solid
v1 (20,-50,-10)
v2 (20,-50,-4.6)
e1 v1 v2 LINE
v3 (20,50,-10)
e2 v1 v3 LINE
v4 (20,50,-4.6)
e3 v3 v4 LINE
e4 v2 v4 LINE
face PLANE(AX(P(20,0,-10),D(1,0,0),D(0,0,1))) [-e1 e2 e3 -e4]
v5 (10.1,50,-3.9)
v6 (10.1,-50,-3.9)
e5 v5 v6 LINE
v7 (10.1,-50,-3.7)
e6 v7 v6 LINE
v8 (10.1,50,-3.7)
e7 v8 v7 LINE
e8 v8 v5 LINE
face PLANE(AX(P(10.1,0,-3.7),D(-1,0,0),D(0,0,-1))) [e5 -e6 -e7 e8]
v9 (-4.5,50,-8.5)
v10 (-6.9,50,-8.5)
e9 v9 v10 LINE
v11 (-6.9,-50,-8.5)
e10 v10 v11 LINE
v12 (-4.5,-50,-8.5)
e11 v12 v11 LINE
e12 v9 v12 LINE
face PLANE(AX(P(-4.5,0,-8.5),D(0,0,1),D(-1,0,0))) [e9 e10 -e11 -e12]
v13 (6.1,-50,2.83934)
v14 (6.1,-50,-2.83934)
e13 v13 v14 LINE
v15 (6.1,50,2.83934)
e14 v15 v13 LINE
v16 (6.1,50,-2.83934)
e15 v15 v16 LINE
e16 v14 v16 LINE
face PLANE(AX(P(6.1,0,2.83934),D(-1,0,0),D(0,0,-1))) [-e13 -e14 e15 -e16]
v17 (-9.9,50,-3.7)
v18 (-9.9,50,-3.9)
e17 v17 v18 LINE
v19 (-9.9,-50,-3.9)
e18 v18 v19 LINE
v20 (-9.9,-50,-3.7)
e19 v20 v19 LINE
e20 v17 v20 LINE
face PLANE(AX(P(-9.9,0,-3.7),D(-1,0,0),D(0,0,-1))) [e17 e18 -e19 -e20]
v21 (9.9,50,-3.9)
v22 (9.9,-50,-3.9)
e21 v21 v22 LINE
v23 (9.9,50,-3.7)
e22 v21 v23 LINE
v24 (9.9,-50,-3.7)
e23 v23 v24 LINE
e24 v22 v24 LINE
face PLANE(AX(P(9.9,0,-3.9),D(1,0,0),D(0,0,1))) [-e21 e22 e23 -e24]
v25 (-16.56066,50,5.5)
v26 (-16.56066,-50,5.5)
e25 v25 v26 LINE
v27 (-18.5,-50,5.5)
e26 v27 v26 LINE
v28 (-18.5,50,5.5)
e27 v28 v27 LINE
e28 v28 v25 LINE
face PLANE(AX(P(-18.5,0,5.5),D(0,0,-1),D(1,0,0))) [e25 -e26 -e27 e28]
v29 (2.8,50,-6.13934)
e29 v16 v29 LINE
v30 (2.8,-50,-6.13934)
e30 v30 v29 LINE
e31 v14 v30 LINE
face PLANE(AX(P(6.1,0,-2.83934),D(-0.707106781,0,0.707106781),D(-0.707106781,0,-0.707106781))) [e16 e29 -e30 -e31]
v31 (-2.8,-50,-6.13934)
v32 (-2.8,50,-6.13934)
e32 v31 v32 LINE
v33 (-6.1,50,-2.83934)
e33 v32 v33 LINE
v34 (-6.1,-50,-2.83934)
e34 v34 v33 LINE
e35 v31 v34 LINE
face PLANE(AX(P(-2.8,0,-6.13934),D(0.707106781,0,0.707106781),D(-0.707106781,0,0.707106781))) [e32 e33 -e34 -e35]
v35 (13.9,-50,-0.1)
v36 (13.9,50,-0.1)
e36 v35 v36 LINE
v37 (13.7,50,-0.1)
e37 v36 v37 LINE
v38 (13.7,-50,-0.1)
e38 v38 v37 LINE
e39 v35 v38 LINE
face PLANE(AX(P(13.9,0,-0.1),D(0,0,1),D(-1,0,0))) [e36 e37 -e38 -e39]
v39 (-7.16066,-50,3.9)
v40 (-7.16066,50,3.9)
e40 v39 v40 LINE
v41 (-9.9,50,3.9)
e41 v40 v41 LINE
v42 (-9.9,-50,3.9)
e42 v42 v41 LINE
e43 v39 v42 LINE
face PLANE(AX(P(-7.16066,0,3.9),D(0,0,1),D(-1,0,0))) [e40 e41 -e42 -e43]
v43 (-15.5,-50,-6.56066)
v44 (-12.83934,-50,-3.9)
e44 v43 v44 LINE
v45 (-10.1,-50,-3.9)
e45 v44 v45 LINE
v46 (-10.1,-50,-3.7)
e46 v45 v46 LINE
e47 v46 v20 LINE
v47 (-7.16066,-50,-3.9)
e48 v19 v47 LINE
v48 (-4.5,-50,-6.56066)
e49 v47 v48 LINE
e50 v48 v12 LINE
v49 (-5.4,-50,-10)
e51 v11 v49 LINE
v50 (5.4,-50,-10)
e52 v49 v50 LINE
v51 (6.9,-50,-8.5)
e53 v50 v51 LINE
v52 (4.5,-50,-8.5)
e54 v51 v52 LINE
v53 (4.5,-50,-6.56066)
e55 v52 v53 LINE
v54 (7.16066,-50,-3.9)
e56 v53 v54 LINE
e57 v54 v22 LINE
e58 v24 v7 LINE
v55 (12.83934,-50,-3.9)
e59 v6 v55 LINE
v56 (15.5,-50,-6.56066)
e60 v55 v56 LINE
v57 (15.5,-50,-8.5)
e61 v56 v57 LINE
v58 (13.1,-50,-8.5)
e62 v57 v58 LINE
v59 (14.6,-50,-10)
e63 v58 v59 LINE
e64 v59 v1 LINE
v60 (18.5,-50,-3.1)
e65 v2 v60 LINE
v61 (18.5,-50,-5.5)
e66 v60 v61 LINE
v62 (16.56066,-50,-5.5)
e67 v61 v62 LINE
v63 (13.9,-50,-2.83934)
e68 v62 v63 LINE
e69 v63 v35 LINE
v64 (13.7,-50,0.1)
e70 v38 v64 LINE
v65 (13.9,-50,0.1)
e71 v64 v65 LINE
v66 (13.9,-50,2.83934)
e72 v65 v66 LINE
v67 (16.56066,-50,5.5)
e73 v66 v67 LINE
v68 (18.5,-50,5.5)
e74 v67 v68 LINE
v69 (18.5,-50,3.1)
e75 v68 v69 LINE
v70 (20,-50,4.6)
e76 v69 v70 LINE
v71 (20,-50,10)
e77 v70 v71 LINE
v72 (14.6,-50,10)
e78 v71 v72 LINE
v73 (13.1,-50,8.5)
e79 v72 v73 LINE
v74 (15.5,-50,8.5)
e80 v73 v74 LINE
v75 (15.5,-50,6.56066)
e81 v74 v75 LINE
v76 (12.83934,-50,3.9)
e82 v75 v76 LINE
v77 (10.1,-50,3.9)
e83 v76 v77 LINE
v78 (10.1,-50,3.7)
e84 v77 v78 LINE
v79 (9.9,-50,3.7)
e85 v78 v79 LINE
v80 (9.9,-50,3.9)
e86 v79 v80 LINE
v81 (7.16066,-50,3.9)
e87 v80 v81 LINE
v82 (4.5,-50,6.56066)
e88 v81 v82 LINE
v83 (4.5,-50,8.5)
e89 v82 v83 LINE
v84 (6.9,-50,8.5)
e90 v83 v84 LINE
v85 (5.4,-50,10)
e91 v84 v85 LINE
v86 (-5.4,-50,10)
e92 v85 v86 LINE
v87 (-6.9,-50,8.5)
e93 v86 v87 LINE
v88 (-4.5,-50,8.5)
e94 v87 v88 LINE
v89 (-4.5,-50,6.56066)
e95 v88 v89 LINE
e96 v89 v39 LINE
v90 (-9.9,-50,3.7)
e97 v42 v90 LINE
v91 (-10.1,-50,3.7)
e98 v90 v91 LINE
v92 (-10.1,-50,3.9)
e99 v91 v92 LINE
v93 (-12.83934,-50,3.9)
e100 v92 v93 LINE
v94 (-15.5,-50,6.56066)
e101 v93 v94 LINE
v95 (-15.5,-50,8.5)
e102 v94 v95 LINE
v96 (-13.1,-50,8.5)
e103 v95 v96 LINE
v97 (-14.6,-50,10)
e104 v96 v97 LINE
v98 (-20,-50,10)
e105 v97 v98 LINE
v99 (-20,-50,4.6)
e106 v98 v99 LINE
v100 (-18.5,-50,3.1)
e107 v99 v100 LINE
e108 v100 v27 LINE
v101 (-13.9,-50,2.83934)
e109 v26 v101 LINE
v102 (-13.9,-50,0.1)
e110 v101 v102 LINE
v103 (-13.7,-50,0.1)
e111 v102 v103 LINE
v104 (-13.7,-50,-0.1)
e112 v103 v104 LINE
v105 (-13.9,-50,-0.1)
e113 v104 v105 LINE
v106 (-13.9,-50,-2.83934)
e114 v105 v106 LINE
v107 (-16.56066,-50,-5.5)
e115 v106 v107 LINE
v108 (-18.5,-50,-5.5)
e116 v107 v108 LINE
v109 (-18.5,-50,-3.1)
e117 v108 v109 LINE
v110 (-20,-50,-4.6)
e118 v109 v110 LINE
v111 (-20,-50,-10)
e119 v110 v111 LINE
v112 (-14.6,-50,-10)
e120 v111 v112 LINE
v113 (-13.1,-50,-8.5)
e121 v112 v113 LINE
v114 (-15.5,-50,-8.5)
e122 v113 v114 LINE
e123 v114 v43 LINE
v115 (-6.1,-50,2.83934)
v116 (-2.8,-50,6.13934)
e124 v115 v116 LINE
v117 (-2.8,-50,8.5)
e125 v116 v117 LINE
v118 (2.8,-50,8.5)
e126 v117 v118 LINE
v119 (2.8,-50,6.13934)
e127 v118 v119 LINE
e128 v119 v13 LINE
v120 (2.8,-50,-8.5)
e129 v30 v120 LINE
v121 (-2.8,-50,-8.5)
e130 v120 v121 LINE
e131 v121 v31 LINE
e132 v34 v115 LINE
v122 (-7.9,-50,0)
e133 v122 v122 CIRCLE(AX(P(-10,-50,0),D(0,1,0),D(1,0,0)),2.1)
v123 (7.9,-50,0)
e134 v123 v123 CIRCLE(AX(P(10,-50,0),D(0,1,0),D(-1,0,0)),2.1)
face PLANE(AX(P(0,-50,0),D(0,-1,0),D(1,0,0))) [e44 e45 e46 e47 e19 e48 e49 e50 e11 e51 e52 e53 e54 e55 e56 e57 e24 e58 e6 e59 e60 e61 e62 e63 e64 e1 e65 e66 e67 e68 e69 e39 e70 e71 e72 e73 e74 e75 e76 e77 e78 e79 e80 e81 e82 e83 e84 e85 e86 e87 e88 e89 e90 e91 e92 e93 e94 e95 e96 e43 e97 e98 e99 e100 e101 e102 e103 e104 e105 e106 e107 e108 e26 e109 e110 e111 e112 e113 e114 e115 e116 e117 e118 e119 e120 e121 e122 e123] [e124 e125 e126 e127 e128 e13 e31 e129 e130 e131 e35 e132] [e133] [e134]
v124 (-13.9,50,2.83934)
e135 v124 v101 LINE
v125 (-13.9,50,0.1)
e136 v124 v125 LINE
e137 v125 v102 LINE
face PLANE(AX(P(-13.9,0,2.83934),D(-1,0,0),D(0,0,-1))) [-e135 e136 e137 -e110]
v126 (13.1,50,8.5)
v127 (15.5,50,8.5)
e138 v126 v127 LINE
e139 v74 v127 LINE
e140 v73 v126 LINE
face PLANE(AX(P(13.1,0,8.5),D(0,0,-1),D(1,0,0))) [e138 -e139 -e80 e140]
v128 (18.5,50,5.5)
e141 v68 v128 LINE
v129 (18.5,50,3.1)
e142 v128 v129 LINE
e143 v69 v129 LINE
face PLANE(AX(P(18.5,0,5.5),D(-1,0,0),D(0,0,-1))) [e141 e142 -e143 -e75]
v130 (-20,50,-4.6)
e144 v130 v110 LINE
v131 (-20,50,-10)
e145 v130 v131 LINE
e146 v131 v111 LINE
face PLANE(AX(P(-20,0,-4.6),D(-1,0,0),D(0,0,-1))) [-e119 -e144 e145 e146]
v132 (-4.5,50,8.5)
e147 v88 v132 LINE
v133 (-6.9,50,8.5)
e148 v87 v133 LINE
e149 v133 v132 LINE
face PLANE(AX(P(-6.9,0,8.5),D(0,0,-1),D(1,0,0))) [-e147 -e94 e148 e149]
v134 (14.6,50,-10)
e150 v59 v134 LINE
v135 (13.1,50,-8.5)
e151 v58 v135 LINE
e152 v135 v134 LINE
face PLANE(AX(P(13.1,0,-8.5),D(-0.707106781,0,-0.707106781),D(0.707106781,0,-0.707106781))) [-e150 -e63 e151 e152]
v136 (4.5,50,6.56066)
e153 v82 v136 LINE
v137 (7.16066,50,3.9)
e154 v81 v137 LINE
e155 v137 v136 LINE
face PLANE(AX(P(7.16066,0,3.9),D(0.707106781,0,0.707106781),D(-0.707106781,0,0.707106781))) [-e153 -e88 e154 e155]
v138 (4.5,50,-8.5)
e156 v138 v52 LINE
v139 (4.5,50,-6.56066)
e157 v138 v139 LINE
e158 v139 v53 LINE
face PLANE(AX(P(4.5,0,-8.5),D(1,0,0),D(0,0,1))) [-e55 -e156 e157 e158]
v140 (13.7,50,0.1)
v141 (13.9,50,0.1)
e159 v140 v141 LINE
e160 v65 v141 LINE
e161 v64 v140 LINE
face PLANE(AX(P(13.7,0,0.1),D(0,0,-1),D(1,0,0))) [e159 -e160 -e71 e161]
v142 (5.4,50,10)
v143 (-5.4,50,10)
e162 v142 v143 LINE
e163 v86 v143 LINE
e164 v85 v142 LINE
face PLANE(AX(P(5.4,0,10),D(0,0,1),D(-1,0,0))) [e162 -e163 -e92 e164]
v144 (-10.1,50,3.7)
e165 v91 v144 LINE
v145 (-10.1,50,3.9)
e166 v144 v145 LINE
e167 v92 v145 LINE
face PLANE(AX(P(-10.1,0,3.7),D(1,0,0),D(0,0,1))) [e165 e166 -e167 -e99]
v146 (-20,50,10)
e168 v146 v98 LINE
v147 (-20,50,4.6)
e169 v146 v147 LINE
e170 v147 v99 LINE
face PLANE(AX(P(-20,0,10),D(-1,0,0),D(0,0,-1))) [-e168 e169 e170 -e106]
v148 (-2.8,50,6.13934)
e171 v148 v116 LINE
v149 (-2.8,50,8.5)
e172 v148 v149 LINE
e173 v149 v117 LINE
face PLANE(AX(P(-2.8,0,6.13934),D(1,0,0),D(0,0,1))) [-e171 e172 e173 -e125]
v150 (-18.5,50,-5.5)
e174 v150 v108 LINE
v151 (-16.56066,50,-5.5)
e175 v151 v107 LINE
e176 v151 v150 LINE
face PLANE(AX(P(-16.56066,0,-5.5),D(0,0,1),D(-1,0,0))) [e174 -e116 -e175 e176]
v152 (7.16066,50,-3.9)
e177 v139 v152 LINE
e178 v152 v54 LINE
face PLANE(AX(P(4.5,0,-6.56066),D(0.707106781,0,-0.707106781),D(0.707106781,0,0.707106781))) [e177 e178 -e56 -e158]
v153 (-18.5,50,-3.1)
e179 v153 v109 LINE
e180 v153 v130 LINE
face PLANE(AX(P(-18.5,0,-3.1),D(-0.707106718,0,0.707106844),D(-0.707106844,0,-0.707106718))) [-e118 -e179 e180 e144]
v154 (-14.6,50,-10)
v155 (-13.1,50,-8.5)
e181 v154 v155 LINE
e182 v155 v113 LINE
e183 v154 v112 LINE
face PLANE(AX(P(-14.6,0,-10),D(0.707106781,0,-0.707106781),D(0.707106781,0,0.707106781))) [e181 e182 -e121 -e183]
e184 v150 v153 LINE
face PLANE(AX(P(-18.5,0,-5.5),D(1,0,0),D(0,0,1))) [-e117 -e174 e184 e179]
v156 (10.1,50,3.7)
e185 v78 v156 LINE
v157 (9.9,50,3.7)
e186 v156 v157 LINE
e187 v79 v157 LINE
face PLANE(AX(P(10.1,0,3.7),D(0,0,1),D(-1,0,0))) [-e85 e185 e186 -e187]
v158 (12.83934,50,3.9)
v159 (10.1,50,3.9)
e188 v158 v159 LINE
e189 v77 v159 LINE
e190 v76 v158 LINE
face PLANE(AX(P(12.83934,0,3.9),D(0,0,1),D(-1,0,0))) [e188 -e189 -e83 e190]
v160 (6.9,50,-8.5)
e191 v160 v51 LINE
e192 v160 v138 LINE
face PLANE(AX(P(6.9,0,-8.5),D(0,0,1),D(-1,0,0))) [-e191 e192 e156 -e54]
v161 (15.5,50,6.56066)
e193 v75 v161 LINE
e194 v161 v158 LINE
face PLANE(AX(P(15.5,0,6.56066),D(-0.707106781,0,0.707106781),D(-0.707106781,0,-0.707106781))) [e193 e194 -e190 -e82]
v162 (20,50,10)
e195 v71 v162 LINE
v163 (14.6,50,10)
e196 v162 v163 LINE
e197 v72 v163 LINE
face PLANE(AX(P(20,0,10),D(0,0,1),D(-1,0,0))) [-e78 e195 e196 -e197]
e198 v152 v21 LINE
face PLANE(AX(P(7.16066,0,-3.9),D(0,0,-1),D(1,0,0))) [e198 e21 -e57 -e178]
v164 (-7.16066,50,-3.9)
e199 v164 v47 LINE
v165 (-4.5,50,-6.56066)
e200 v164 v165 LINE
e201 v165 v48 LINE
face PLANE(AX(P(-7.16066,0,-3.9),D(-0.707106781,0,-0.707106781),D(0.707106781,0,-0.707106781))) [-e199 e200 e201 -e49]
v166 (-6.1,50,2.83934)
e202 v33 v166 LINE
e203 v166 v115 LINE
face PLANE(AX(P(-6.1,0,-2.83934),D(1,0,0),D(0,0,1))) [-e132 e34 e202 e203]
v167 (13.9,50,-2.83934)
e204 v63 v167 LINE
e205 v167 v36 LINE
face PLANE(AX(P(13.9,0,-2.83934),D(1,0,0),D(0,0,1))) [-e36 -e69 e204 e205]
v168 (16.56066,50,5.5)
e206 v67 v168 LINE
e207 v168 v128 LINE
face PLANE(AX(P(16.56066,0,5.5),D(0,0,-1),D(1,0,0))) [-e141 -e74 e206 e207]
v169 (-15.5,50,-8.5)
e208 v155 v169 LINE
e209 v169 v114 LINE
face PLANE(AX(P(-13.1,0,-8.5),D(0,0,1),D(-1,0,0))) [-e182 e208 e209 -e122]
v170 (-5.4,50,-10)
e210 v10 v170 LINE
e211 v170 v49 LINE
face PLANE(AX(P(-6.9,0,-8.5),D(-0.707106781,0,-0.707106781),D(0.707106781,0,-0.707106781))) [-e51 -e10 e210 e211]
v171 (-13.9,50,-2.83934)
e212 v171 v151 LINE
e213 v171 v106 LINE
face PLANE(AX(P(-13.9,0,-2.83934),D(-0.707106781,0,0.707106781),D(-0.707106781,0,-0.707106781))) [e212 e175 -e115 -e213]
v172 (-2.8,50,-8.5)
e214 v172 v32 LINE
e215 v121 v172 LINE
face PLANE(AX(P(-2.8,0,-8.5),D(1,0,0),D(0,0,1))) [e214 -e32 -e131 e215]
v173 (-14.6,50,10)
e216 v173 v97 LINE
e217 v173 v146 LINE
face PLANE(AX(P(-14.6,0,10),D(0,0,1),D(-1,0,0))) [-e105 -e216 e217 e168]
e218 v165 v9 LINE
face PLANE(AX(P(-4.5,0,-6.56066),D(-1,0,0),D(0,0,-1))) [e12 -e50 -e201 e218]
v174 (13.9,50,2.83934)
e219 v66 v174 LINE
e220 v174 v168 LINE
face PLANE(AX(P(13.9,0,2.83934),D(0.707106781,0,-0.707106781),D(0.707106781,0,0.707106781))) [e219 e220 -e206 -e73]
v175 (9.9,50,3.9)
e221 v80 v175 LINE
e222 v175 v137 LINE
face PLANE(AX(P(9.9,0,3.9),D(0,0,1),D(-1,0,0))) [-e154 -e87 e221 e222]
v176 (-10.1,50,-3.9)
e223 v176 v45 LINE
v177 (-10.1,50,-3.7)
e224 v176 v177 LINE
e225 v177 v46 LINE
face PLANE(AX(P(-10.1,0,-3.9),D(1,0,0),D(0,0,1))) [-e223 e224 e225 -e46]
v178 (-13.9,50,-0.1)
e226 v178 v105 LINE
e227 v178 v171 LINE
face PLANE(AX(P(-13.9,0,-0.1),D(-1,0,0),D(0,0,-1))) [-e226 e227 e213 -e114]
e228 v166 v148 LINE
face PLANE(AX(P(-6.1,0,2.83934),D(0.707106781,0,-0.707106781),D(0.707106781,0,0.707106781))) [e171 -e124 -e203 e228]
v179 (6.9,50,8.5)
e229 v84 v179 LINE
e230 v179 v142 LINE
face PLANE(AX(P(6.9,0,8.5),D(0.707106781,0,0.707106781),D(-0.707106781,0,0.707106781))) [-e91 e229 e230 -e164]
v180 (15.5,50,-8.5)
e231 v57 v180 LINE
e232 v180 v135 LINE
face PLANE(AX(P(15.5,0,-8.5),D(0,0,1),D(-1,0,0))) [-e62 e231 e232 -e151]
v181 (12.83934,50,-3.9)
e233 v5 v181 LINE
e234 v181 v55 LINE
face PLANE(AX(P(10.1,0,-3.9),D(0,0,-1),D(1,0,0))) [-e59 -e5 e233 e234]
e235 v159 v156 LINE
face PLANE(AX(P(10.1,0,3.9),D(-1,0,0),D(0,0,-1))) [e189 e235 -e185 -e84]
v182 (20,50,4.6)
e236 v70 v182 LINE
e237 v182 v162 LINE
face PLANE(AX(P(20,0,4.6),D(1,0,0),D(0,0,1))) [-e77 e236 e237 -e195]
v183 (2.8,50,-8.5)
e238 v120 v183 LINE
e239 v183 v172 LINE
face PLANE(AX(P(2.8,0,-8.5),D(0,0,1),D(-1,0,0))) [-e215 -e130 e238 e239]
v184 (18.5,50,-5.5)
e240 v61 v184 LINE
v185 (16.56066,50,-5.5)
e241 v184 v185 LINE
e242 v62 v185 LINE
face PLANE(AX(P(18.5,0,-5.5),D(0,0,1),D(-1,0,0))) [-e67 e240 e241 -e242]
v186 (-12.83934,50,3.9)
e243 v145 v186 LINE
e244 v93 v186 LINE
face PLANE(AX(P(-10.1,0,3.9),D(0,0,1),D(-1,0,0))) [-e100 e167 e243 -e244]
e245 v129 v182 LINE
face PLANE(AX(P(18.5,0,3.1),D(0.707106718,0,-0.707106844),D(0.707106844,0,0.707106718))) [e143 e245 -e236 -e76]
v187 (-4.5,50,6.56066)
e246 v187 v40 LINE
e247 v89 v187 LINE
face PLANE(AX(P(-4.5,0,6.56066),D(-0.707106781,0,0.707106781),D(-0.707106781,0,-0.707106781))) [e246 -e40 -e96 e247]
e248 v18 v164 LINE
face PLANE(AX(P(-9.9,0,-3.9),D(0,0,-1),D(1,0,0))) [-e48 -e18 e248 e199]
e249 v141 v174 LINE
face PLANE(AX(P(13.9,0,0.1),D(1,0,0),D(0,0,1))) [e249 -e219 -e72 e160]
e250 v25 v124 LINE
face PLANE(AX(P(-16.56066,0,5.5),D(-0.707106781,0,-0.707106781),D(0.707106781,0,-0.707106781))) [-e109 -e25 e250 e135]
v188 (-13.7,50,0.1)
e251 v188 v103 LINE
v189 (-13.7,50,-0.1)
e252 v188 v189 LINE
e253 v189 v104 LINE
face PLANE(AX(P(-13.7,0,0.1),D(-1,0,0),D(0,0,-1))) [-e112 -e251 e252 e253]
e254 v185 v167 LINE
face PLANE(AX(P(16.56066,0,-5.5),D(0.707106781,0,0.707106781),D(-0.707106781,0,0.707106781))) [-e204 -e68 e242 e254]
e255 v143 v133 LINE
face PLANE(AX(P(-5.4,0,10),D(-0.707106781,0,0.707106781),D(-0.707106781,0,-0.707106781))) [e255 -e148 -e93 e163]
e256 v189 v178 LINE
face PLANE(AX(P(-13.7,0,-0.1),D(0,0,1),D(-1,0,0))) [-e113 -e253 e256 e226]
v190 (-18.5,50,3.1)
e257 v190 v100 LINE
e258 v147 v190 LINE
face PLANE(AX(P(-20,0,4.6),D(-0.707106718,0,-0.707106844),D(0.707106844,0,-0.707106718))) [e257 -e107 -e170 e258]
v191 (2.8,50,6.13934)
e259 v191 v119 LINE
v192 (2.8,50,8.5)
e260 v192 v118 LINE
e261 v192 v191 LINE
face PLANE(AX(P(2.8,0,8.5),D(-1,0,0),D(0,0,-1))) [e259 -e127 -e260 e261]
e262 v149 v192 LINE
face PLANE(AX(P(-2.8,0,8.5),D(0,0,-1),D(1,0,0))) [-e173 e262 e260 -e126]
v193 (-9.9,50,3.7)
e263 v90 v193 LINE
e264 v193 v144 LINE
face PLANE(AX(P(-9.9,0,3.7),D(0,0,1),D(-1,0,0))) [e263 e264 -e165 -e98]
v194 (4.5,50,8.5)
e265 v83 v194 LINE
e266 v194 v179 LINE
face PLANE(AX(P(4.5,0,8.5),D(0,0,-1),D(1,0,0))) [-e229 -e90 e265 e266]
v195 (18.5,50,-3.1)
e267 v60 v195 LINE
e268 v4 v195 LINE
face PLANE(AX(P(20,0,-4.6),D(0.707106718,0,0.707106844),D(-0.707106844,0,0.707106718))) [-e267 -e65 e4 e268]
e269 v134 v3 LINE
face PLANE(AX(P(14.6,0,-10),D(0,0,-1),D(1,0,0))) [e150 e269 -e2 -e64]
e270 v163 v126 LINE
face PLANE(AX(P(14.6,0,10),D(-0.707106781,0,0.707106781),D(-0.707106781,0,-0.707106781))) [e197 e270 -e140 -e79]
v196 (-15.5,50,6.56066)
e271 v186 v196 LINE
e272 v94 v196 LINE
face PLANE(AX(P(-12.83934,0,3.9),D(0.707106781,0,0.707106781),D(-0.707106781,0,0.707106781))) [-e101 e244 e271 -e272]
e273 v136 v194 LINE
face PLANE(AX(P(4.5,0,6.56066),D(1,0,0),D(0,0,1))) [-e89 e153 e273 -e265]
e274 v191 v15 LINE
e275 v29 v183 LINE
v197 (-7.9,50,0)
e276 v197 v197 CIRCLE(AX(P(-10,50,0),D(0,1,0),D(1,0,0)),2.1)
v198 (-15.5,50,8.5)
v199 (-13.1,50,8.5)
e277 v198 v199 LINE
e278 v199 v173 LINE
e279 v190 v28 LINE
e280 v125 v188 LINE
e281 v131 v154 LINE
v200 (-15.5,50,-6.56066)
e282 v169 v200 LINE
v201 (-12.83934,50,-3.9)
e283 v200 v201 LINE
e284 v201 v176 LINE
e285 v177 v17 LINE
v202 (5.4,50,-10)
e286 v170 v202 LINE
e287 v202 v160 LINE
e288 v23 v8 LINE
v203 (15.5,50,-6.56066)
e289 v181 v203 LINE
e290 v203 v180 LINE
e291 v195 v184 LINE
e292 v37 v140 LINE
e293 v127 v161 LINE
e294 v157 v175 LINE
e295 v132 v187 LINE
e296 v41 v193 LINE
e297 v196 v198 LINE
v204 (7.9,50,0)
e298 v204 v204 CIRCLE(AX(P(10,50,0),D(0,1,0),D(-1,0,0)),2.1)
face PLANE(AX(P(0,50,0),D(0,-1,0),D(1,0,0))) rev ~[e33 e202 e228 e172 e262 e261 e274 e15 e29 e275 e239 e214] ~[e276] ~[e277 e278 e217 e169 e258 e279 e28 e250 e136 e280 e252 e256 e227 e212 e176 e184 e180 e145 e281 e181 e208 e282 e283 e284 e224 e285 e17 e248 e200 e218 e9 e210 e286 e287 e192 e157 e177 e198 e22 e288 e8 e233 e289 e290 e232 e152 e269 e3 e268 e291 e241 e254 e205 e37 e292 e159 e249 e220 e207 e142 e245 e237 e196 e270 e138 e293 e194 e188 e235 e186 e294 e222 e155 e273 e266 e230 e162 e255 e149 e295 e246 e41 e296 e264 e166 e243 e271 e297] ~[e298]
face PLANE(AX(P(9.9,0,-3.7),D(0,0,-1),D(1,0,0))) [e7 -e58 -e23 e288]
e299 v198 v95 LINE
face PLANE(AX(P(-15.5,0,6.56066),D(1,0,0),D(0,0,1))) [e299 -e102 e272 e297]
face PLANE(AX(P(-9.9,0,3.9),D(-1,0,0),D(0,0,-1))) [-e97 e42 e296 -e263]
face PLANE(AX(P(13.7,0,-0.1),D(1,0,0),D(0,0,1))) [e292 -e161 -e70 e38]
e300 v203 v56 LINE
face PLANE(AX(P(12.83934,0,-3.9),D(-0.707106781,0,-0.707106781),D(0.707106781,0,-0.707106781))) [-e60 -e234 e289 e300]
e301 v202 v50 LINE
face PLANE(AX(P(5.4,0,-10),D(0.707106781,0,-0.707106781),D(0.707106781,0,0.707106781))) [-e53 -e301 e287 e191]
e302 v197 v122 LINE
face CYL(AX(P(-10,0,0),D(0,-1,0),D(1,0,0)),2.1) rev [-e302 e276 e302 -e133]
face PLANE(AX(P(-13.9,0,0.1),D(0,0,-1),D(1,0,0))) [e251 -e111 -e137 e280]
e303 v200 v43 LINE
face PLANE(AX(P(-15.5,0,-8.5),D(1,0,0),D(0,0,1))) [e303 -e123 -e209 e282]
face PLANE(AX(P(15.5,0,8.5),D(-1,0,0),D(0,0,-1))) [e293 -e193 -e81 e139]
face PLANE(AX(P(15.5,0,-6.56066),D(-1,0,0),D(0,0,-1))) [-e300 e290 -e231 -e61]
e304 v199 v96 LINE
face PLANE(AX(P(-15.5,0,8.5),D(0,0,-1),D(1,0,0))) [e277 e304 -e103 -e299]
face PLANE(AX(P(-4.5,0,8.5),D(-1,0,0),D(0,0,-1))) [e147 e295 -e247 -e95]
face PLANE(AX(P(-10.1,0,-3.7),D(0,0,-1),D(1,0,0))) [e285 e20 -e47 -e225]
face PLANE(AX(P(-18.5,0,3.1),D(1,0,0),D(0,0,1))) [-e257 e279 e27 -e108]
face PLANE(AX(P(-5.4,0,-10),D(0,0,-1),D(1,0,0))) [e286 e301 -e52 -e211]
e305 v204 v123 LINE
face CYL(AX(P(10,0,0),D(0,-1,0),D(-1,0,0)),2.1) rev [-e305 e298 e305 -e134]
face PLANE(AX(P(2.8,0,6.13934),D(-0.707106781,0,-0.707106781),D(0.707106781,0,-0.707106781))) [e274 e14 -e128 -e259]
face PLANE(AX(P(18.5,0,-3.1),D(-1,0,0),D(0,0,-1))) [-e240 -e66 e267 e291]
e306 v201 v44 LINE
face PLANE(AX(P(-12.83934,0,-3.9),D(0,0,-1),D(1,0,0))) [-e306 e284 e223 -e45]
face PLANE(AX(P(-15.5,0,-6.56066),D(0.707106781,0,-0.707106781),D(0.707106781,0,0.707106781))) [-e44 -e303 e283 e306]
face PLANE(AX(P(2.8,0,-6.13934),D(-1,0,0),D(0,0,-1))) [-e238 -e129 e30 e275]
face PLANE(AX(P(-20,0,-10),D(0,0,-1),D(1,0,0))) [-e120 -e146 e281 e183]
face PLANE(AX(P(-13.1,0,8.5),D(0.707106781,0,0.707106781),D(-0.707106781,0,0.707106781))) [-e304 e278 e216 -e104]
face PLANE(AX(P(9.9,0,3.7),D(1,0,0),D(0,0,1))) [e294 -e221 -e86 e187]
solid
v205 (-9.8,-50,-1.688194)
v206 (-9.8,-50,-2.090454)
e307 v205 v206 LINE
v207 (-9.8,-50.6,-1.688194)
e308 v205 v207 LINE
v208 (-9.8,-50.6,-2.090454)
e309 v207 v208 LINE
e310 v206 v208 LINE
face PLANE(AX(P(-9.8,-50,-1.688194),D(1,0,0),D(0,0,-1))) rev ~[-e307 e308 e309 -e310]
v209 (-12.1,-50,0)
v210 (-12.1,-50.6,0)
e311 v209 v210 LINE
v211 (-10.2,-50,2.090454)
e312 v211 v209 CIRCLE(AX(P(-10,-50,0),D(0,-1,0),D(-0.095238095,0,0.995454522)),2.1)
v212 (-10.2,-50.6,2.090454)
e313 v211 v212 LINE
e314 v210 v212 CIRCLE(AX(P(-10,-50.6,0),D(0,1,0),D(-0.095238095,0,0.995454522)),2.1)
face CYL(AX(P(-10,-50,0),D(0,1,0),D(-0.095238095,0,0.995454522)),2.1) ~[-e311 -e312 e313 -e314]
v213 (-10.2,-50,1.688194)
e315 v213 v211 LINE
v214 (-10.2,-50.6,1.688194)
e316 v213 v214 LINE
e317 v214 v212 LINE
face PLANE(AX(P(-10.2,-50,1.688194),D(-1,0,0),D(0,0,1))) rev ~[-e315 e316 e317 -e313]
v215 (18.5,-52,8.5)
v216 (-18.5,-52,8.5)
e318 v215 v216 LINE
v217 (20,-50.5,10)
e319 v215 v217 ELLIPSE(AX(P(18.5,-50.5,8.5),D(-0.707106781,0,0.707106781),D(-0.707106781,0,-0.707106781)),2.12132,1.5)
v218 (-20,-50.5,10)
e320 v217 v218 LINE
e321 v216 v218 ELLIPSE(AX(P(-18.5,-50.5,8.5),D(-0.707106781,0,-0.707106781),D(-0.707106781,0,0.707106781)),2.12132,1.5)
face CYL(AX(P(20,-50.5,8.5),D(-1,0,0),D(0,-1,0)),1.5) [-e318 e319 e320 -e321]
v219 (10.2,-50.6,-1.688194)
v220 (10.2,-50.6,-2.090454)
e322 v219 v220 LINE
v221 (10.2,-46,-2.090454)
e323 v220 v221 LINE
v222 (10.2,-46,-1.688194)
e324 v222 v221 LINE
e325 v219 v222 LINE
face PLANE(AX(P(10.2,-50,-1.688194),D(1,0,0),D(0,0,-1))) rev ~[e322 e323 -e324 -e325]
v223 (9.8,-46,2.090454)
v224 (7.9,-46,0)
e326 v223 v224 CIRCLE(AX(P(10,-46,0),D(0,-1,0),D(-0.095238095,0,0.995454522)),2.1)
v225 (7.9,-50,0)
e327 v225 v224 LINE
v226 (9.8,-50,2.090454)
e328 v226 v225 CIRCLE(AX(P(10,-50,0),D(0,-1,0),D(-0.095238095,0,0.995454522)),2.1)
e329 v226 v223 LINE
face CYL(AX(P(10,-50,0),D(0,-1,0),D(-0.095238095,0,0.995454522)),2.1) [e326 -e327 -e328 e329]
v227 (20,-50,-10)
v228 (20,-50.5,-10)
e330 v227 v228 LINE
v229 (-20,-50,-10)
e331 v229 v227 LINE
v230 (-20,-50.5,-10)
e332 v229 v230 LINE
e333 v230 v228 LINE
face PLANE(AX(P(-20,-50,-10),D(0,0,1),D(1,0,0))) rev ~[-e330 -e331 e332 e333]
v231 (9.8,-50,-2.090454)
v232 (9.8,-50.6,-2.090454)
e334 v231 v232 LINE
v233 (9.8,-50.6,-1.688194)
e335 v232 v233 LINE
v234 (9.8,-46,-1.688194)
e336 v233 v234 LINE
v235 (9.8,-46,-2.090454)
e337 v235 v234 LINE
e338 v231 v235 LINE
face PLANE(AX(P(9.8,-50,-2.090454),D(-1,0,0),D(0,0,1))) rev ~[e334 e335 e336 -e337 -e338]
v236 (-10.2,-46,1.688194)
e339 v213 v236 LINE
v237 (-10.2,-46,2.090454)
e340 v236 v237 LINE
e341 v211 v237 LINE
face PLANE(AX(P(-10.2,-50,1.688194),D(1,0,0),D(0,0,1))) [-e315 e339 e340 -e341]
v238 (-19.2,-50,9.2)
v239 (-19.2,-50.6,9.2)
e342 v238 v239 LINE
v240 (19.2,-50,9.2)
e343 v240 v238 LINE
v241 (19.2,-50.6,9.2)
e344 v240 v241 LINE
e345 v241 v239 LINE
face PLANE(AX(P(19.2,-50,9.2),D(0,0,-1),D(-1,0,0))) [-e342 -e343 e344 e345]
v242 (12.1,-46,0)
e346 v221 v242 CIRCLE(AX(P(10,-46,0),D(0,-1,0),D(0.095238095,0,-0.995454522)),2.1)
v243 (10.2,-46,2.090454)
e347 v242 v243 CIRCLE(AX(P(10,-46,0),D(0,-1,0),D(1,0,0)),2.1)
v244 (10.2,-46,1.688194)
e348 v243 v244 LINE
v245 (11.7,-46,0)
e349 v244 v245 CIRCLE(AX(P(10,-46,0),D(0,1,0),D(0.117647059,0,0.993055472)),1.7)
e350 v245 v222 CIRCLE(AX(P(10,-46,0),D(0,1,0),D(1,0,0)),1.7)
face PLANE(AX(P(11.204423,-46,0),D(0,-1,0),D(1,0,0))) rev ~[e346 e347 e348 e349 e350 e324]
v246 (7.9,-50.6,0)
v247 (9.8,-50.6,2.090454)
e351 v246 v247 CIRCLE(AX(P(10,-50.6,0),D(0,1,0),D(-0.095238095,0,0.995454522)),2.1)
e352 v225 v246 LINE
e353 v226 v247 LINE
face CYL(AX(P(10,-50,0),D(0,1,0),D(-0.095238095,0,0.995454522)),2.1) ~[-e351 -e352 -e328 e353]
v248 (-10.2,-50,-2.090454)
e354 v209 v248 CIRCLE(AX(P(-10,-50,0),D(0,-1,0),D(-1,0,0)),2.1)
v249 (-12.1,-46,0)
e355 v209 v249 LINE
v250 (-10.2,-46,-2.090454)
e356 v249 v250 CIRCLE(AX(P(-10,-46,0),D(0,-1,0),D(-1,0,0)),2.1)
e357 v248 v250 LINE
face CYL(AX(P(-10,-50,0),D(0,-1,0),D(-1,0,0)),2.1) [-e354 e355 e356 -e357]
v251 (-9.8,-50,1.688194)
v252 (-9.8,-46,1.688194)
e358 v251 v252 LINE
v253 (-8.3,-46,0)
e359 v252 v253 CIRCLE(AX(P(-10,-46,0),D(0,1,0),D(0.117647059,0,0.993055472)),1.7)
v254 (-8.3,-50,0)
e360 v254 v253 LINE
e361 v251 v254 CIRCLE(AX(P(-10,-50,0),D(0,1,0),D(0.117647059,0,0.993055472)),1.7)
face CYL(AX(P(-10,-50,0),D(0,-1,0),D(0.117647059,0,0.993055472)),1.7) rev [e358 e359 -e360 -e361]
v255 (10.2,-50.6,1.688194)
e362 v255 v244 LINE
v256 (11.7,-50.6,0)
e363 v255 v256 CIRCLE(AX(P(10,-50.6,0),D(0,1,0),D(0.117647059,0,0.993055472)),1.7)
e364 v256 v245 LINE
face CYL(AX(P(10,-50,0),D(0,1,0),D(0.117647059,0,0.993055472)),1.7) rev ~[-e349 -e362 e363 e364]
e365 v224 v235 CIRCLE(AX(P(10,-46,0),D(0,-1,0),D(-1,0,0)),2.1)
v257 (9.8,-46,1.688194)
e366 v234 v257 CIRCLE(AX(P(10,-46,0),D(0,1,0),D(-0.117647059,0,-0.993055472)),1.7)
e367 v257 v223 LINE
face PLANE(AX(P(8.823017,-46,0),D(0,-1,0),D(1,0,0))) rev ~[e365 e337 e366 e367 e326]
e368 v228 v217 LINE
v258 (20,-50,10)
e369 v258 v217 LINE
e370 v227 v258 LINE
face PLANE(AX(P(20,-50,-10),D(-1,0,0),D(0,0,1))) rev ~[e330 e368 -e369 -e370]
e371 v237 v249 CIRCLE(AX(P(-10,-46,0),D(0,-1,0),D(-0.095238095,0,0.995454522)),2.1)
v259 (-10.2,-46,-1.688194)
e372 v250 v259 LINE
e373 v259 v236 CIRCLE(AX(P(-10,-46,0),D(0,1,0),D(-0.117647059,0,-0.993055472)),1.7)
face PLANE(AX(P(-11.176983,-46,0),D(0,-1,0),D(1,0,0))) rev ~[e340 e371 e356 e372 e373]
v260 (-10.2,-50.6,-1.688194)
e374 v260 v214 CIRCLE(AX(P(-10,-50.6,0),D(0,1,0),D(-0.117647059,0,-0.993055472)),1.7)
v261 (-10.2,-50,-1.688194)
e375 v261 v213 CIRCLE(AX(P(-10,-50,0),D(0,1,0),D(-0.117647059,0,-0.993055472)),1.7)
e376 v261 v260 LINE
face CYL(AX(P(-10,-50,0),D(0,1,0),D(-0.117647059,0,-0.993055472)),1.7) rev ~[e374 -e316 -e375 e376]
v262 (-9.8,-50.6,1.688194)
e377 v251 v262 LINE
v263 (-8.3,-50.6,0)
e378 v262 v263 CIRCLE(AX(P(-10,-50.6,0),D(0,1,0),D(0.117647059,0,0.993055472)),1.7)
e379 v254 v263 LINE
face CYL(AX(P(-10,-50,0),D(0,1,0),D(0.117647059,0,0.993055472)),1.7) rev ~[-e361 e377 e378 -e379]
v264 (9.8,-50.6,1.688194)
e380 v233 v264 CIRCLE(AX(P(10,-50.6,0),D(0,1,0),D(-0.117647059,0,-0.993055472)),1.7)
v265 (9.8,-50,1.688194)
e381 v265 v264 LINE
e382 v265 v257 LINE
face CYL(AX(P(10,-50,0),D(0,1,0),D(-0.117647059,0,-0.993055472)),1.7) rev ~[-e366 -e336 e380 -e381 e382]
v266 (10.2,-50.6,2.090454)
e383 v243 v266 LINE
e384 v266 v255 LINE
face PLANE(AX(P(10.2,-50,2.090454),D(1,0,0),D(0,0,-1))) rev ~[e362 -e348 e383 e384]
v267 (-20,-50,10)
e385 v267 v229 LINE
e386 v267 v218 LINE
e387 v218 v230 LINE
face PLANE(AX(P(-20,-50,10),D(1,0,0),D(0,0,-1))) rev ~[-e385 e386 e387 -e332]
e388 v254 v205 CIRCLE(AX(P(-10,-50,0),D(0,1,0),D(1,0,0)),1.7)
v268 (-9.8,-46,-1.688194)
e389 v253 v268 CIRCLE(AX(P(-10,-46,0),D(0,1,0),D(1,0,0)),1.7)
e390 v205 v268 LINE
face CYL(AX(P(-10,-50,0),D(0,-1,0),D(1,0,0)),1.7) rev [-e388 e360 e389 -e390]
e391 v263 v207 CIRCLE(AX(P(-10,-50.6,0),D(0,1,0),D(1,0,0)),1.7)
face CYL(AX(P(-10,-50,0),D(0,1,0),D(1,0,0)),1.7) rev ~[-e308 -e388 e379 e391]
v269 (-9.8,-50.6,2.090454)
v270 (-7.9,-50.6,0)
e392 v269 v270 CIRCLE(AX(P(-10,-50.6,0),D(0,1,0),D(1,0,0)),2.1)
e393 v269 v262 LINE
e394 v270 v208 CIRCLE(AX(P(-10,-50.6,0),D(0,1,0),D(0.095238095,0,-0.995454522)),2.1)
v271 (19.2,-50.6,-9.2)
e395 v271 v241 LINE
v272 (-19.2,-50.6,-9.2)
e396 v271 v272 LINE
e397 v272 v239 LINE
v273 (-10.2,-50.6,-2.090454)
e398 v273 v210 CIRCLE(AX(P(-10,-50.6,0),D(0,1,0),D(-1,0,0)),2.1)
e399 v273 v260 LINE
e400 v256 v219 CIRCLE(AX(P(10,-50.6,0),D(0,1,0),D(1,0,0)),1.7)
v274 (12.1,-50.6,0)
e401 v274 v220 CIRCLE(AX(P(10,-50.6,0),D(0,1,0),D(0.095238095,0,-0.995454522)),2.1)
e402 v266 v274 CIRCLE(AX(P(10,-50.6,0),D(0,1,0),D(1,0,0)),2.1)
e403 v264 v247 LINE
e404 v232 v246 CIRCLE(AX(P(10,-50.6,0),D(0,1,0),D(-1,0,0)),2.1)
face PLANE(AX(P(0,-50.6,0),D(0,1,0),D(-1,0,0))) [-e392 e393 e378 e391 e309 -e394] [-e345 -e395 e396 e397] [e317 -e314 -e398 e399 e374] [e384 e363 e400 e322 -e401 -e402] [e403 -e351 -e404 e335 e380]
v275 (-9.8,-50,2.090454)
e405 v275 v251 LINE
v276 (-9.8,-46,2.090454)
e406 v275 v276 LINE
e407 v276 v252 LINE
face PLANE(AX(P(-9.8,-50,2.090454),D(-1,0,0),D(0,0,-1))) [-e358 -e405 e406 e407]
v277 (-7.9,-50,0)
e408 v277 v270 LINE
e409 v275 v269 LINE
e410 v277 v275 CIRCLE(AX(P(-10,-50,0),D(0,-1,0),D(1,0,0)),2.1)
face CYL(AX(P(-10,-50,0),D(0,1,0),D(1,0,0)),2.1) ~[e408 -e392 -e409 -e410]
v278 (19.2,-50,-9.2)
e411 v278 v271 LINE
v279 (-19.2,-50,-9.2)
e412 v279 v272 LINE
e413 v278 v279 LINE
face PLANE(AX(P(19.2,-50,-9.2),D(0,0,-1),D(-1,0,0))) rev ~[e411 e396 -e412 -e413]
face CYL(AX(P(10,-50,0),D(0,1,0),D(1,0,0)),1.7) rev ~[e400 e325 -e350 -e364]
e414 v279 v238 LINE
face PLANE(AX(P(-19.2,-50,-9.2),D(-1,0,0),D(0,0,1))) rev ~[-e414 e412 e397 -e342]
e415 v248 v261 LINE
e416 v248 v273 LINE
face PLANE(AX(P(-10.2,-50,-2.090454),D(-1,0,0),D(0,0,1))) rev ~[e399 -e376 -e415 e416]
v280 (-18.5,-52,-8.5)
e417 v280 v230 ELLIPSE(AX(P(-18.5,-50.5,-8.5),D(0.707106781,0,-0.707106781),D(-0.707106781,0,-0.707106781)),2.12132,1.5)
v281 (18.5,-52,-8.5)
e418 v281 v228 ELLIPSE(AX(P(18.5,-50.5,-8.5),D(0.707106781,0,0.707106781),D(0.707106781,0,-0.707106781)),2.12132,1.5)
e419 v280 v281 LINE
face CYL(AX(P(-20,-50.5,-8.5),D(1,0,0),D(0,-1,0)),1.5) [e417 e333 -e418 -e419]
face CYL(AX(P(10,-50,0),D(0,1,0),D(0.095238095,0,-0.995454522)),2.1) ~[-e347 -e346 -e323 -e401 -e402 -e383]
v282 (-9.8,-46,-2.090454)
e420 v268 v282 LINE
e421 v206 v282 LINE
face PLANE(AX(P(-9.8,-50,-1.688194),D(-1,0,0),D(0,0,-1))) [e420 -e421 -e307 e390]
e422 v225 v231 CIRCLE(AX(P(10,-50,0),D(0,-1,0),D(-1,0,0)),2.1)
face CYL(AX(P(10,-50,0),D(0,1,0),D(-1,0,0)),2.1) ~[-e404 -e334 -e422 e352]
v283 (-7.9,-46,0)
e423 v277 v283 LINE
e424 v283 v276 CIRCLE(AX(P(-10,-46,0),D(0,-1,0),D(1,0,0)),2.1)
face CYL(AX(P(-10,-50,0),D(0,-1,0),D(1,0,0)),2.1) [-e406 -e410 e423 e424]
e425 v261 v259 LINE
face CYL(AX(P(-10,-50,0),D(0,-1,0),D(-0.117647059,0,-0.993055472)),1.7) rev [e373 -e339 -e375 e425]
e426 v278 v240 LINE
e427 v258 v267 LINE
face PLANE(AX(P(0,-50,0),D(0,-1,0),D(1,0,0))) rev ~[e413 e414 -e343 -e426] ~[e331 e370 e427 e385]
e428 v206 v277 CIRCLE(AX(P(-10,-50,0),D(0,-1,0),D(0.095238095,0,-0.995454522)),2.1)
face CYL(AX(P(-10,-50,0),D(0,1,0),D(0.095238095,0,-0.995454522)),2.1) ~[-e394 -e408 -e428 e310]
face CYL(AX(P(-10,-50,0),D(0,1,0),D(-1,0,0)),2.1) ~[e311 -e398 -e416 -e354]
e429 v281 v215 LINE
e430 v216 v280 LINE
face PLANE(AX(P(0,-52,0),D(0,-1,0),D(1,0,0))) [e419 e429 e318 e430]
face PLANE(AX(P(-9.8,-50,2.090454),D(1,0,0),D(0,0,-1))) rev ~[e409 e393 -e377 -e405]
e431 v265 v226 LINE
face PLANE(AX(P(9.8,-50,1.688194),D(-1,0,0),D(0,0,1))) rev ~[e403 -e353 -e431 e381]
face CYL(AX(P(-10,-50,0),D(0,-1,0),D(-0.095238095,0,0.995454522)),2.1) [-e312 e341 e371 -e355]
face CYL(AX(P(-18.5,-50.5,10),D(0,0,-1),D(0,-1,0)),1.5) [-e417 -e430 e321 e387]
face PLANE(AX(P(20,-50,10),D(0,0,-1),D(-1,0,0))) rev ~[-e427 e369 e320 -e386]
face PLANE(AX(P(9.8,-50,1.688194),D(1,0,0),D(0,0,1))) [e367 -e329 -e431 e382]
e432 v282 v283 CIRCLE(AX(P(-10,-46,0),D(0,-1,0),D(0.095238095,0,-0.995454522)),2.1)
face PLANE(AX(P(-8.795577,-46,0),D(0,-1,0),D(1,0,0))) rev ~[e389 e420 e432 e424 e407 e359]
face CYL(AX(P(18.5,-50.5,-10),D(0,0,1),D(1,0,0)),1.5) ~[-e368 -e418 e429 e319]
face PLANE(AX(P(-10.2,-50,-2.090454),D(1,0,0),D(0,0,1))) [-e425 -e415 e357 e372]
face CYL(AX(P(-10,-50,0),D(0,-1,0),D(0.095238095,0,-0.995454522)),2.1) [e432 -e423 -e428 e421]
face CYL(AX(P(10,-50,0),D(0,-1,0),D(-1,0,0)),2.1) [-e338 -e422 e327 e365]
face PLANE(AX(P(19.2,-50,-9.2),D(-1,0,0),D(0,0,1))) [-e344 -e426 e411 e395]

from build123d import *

# Parameters (mm, degrees)
F1_DEPTH      = 50
F3_DEPTH      = 2
F4_W          = 38.4
F4_H          = 18.3999997326
F5_DEPTH      = 0.6
F6_DEPTH      = 4
F6_DEPTH_BACK = 1
F7_R          = 1.5


with BuildPart() as f1:
    # F0 (on Front) → F1 (new body, symmetric)
    with BuildSketch(Plane.XZ):
        Polygon((-15.5, 6.5606601718), (-15.5, 8.4999998663), (-13.1, 8.4999998663), (-14.6, 9.9999998663), (-20, 9.9999998663), (-20, 4.5999998663), (-18.4999998663, 3.1), (-18.4999998663, 5.5), (-16.5606601718, 5.5), (-13.9, 2.8393398282), (-13.9, 0.1), (-13.7, 0.1), (-13.7, 0), (-13.7, -0.1), (-13.9, -0.1), (-13.9, -2.8393398282), (-16.5606601718, -5.5), (-18.4999998663, -5.5), (-18.4999998663, -3.1), (-20, -4.5999998663), (-20, -9.9999998663), (-14.6, -9.9999998663), (-13.1, -8.4999998663), (-15.5, -8.4999998663), (-15.5, -6.5606601718), (-12.8393398282, -3.9), (-10.1, -3.9), (-10.1, -3.7), (-9.9, -3.7), (-9.9, -3.9), (-7.1606601718, -3.9), (-4.5, -6.5606601718), (-4.5, -8.4999998663), (-6.9, -8.4999998663), (-5.4, -9.9999998663), (0, -9.9999998663), (5.4, -9.9999998663), (6.9, -8.4999998663), (4.5, -8.4999998663), (4.5, -6.5606601718), (7.1606601718, -3.9), (9.9, -3.9), (9.9, -3.7), (10.1, -3.7), (10.1, -3.9), (12.8393398282, -3.9), (15.5, -6.5606601718), (15.5, -8.4999998663), (13.1, -8.4999998663), (14.6, -9.9999998663), (20, -9.9999998663), (20, -4.5999998663), (18.4999998663, -3.1), (18.4999998663, -5.5), (16.5606601718, -5.5), (13.9, -2.8393398282), (13.9, -0.1), (13.7, -0.1), (13.7, 0), (13.7, 0.1), (13.9, 0.1), (13.9, 2.8393398282), (16.5606601718, 5.5), (18.4999998663, 5.5), (18.4999998663, 3.1), (20, 4.5999998663), (20, 9.9999998663), (14.6, 9.9999998663), (13.1, 8.4999998663), (15.5, 8.4999998663), (15.5, 6.5606601718), (12.8393398282, 3.9), (10.1, 3.9), (10.1, 3.7), (9.9, 3.7), (9.9, 3.9), (7.1606601718, 3.9), (4.5, 6.5606601718), (4.5, 8.4999998663), (6.9, 8.4999998663), (5.4, 9.9999998663), (0, 9.9999998663), (-5.4, 9.9999998663), (-6.9, 8.4999998663), (-4.5, 8.4999998663), (-4.5, 6.5606601718), (-7.1606601718, 3.9), (-9.9, 3.9), (-9.9, 3.7), (-10.1, 3.7), (-10.1, 3.9), (-12.8393398282, 3.9), align=None)
        with BuildLine():
            ThreePointArc((-12.1, 0), (-10, 2.1), (-7.9, 0))
            ThreePointArc((-7.9, 0), (-10, -2.1), (-12.1, 0))
        make_face(mode=Mode.SUBTRACT)
        Polygon((-6.1, 2.8393398282), (-2.8, 6.1393398282), (-2.8, 8.4999998663), (0, 8.4999998663), (2.8, 8.4999998663), (2.8, 6.1393398282), (6.1, 2.8393398282), (6.1, 0), (6.1, -2.8393398282), (2.8, -6.1393398282), (2.8, -8.4999998663), (0, -8.4999998663), (-2.8, -8.4999998663), (-2.8, -6.1393398282), (-6.1, -2.8393398282), (-6.1, 0), align=None, mode=Mode.SUBTRACT)
        with BuildLine():
            ThreePointArc((12.1, 0), (10, -2.1), (7.9, 0))
            ThreePointArc((7.9, 0), (10, 2.1), (12.1, 0))
        make_face(mode=Mode.SUBTRACT)
    extrude(amount=F1_DEPTH, both=True)


with BuildPart() as f3:
    # F2 (on face) → F3 (new body)
    with BuildSketch(Plane.XZ.offset(50)):
        Polygon((-14.6, 9.9999998663), (-20, 9.9999998663), (-20, 4.5999998663), (-18.4999998663, 3.1), (-18.4999998663, 5.5), (-16.5606601718, 5.5), (-13.9, 2.8393398282), (-13.9, 0.1), (-13.7, 0.1), (-13.7, -0.1), (-13.9, -0.1), (-13.9, -2.8393398282), (-16.5606601718, -5.5), (-18.4999998663, -5.5), (-18.4999998663, -3.1), (-20, -4.5999998663), (-20, -9.9999998663), (-14.6, -9.9999998663), (-13.1, -8.4999998663), (-15.5, -8.4999998663), (-15.5, -6.5606601718), (-12.8393398282, -3.9), (-10.1, -3.9), (-10.1, -3.7), (-9.9, -3.7), (-9.9, -3.9), (-7.1606601718, -3.9), (-4.5, -6.5606601718), (-4.5, -8.4999998663), (-6.9, -8.4999998663), (-5.4, -9.9999998663), (5.4, -9.9999998663), (6.9, -8.4999998663), (4.5, -8.4999998663), (4.5, -6.5606601718), (7.1606601718, -3.9), (9.9, -3.9), (9.9, -3.7), (10.1, -3.7), (10.1, -3.9), (12.8393398282, -3.9), (15.5, -6.5606601718), (15.5, -8.4999998663), (13.1, -8.4999998663), (14.6, -9.9999998663), (20, -9.9999998663), (20, -4.5999998663), (18.4999998663, -3.1), (18.4999998663, -5.5), (16.5606601718, -5.5), (13.9, -2.8393398282), (13.9, -0.1), (13.7, -0.1), (13.7, 0.1), (13.9, 0.1), (13.9, 2.8393398282), (16.5606601718, 5.5), (18.4999998663, 5.5), (18.4999998663, 3.1), (20, 4.5999998663), (20, 9.9999998663), (14.6, 9.9999998663), (13.1, 8.4999998663), (15.5, 8.4999998663), (15.5, 6.5606601718), (12.8393398282, 3.9), (10.1, 3.9), (10.1, 3.7), (9.9, 3.7), (9.9, 3.9), (7.1606601718, 3.9), (4.5, 6.5606601718), (4.5, 8.4999998663), (6.9, 8.4999998663), (5.4, 9.9999998663), (-5.4, 9.9999998663), (-6.9, 8.4999998663), (-4.5, 8.4999998663), (-4.5, 6.5606601718), (-7.1606601718, 3.9), (-9.9, 3.9), (-9.9, 3.7), (-10.1, 3.7), (-10.1, 3.9), (-12.8393398282, 3.9), (-15.5, 6.5606601718), (-15.5, 8.4999998663), (-13.1, 8.4999998663), align=None)
        with BuildLine():
            ThreePointArc((-9.8, 2.090454496), (-8.4459729732, 1.4124446892), (-7.9, 0))
            ThreePointArc((-7.9, 0), (-8.4459729732, -1.4124446892), (-9.8, -2.090454496))
            ThreePointArc((-9.8, -2.090454496), (-10, -2.1), (-10.2, -2.090454496))
            ThreePointArc((-10.2, -2.090454496), (-11.5540270268, -1.4124446892), (-12.1, 0))
            ThreePointArc((-12.1, 0), (-11.5540270268, 1.4124446892), (-10.2, 2.090454496))
            ThreePointArc((-10.2, 2.090454496), (-10, 2.1), (-9.8, 2.090454496))
        make_face(mode=Mode.SUBTRACT)
        Polygon((6.1, -2.8393398282), (2.8, -6.1393398282), (2.8, -8.4999998663), (0, -8.4999998663), (-2.8, -8.4999998663), (-2.8, -6.1393398282), (-6.1, -2.8393398282), (-6.1, 0), (-6.1, 2.8393398282), (-2.8, 6.1393398282), (-2.8, 8.4999998663), (0, 8.4999998663), (2.8, 8.4999998663), (2.8, 6.1393398282), (6.1, 2.8393398282), (6.1, 0), align=None, mode=Mode.SUBTRACT)
        with BuildLine():
            ThreePointArc((10.2, 2.090454496), (11.5540270268, 1.4124446892), (12.1, 0))
            ThreePointArc((12.1, 0), (11.5540270268, -1.4124446892), (10.2, -2.090454496))
            ThreePointArc((10.2, -2.090454496), (10, -2.1), (9.8, -2.090454496))
            ThreePointArc((9.8, -2.090454496), (8.4459729732, -1.4124446892), (7.9, 0))
            ThreePointArc((7.9, 0), (8.4459729732, 1.4124446892), (9.8, 2.090454496))
            ThreePointArc((9.8, 2.090454496), (10, 2.1), (10.2, 2.090454496))
        make_face(mode=Mode.SUBTRACT)
        Polygon((2.8, -8.4999998663), (2.8, -6.1393398282), (6.1, -2.8393398282), (6.1, 0), (6.1, 2.8393398282), (2.8, 6.1393398282), (2.8, 8.4999998663), (0, 8.4999998663), (-2.8, 8.4999998663), (-2.8, 6.1393398282), (-6.1, 2.8393398282), (-6.1, 0), (-6.1, -2.8393398282), (-2.8, -6.1393398282), (-2.8, -8.4999998663), (0, -8.4999998663), align=None)
        Polygon((20, -4.5999998663), (20, 4.5999998663), (18.4999998663, 3.1), (18.4999998663, 5.5), (16.5606601718, 5.5), (13.9, 2.8393398282), (13.9, 0.1), (13.7, 0.1), (13.7, -0.1), (13.9, -0.1), (13.9, -2.8393398282), (16.5606601718, -5.5), (18.4999998663, -5.5), (18.4999998663, -3.1), align=None)
        Polygon((-18.4999998663, 3.1), (-20, 4.5999998663), (-20, -4.5999998663), (-18.4999998663, -3.1), (-18.4999998663, -5.5), (-16.5606601718, -5.5), (-13.9, -2.8393398282), (-13.9, -0.1), (-13.7, -0.1), (-13.7, 0.1), (-13.9, 0.1), (-13.9, 2.8393398282), (-16.5606601718, 5.5), (-18.4999998663, 5.5), align=None)
        Polygon((-5.4, 9.9999998663), (-14.6, 9.9999998663), (-13.1, 8.4999998663), (-15.5, 8.4999998663), (-15.5, 6.5606601718), (-12.8393398282, 3.9), (-10.1, 3.9), (-10.1, 3.7), (-9.9, 3.7), (-9.9, 3.9), (-7.1606601718, 3.9), (-4.5, 6.5606601718), (-4.5, 8.4999998663), (-6.9, 8.4999998663), align=None)
        Polygon((14.6, 9.9999998663), (5.4, 9.9999998663), (6.9, 8.4999998663), (4.5, 8.4999998663), (4.5, 6.5606601718), (7.1606601718, 3.9), (9.9, 3.9), (9.9, 3.7), (10.1, 3.7), (10.1, 3.9), (12.8393398282, 3.9), (15.5, 6.5606601718), (15.5, 8.4999998663), (13.1, 8.4999998663), align=None)
        Polygon((6.9, -8.4999998663), (5.4, -9.9999998663), (14.6, -9.9999998663), (13.1, -8.4999998663), (15.5, -8.4999998663), (15.5, -6.5606601718), (12.8393398282, -3.9), (10.1, -3.9), (10.1, -3.7), (9.9, -3.7), (9.9, -3.9), (7.1606601718, -3.9), (4.5, -6.5606601718), (4.5, -8.4999998663), align=None)
        Polygon((-13.1, -8.4999998663), (-14.6, -9.9999998663), (-5.4, -9.9999998663), (-6.9, -8.4999998663), (-4.5, -8.4999998663), (-4.5, -6.5606601718), (-7.1606601718, -3.9), (-9.9, -3.9), (-9.9, -3.7), (-10.1, -3.7), (-10.1, -3.9), (-12.8393398282, -3.9), (-15.5, -6.5606601718), (-15.5, -8.4999998663), align=None)
        with BuildLine():
            ThreePointArc((-8.3, 0), (-8.7291734973, 1.1291589791), (-9.8, 1.6881943016))
            ThreePointArc((-9.8, 1.6881943016), (-10, 1.7), (-10.2, 1.6881943016))
            ThreePointArc((-10.2, 1.6881943016), (-11.7, 0), (-10.2, -1.6881943016))
            ThreePointArc((-10.2, -1.6881943016), (-10, -1.7), (-9.8, -1.6881943016))
            ThreePointArc((-9.8, -1.6881943016), (-8.7291734973, -1.1291589791), (-8.3, 0))
        make_face()
        with BuildLine():
            ThreePointArc((11.7, 0), (11.2708265027, 1.1291589791), (10.2, 1.6881943016))
            ThreePointArc((10.2, 1.6881943016), (10, 1.7), (9.8, 1.6881943016))
            ThreePointArc((9.8, 1.6881943016), (8.3, 0), (9.8, -1.6881943016))
            ThreePointArc((9.8, -1.6881943016), (10, -1.7), (10.2, -1.6881943016))
            ThreePointArc((10.2, -1.6881943016), (11.2708265027, -1.1291589791), (11.7, 0))
        make_face()
        with BuildLine():
            Line((9.8, 1.6881943016), (9.8, 2.090454496))
            ThreePointArc((9.8, 2.090454496), (8.4459729732, 1.4124446892), (7.9, 0))
            ThreePointArc((7.9, 0), (8.4459729732, -1.4124446892), (9.8, -2.090454496))
            Line((9.8, -2.090454496), (9.8, -1.6881943016))
            ThreePointArc((9.8, -1.6881943016), (8.3, 0), (9.8, 1.6881943016))
        make_face()
        with BuildLine():
            ThreePointArc((10.2, -2.090454496), (11.5540270268, -1.4124446892), (12.1, 0))
            ThreePointArc((12.1, 0), (11.5540270268, 1.4124446892), (10.2, 2.090454496))
            Line((10.2, 2.090454496), (10.2, 1.6881943016))
            ThreePointArc((10.2, 1.6881943016), (11.2708265027, 1.1291589791), (11.7, 0))
            ThreePointArc((11.7, 0), (11.2708265027, -1.1291589791), (10.2, -1.6881943016))
            Line((10.2, -1.6881943016), (10.2, -2.090454496))
        make_face()
        with BuildLine():
            Line((-10.2, 1.6881943016), (-10.2, 2.090454496))
            ThreePointArc((-10.2, 2.090454496), (-11.5540270268, 1.4124446892), (-12.1, 0))
            ThreePointArc((-12.1, 0), (-11.5540270268, -1.4124446892), (-10.2, -2.090454496))
            Line((-10.2, -2.090454496), (-10.2, -1.6881943016))
            ThreePointArc((-10.2, -1.6881943016), (-11.7, 0), (-10.2, 1.6881943016))
        make_face()
        with BuildLine():
            ThreePointArc((-9.8, -2.090454496), (-8.4459729732, -1.4124446892), (-7.9, 0))
            ThreePointArc((-7.9, 0), (-8.4459729732, 1.4124446892), (-9.8, 2.090454496))
            Line((-9.8, 2.090454496), (-9.8, 1.6881943016))
            ThreePointArc((-9.8, 1.6881943016), (-8.7291734973, 1.1291589791), (-8.3, 0))
            ThreePointArc((-8.3, 0), (-8.7291734973, -1.1291589791), (-9.8, -1.6881943016))
            Line((-9.8, -1.6881943016), (-9.8, -2.090454496))
        make_face()
        with BuildLine():
            Line((10.2, 1.6881943016), (10.2, 2.090454496))
            ThreePointArc((10.2, 2.090454496), (10, 2.1), (9.8, 2.090454496))
            Line((9.8, 2.090454496), (9.8, 1.6881943016))
            ThreePointArc((9.8, 1.6881943016), (10, 1.7), (10.2, 1.6881943016))
        make_face()
        with BuildLine():
            ThreePointArc((9.8, -2.090454496), (10, -2.1), (10.2, -2.090454496))
            Line((10.2, -2.090454496), (10.2, -1.6881943016))
            ThreePointArc((10.2, -1.6881943016), (10, -1.7), (9.8, -1.6881943016))
            Line((9.8, -1.6881943016), (9.8, -2.090454496))
        make_face()
        with BuildLine():
            Line((-9.8, 1.6881943016), (-9.8, 2.090454496))
            ThreePointArc((-9.8, 2.090454496), (-10, 2.1), (-10.2, 2.090454496))
            Line((-10.2, 2.090454496), (-10.2, 1.6881943016))
            ThreePointArc((-10.2, 1.6881943016), (-10, 1.7), (-9.8, 1.6881943016))
        make_face()
        with BuildLine():
            ThreePointArc((-10.2, -2.090454496), (-10, -2.1), (-9.8, -2.090454496))
            Line((-9.8, -2.090454496), (-9.8, -1.6881943016))
            ThreePointArc((-9.8, -1.6881943016), (-10, -1.7), (-10.2, -1.6881943016))
            Line((-10.2, -1.6881943016), (-10.2, -2.090454496))
        make_face()
    extrude(amount=F3_DEPTH)

    # F4 (on face) → F5 (cut)
    with BuildSketch(Plane(origin=(0, -50, 0), x_dir=(-1, 0, 0), z_dir=(0, 1, 0))):
        Rectangle(F4_W, F4_H)
    extrude(amount=-F5_DEPTH, mode=Mode.SUBTRACT)

    # F2 (on face) → F6 (join, two sides)
    with BuildSketch(Plane.XZ.offset(50)) as f6_sk:
        with BuildLine():
            ThreePointArc((10.2, -2.090454496), (11.5540270268, -1.4124446892), (12.1, 0))
            ThreePointArc((12.1, 0), (11.5540270268, 1.4124446892), (10.2, 2.090454496))
            Line((10.2, 2.090454496), (10.2, 1.6881943016))
            ThreePointArc((10.2, 1.6881943016), (11.2708265027, 1.1291589791), (11.7, 0))
            ThreePointArc((11.7, 0), (11.2708265027, -1.1291589791), (10.2, -1.6881943016))
            Line((10.2, -1.6881943016), (10.2, -2.090454496))
        make_face()
        with BuildLine():
            Line((9.8, 1.6881943016), (9.8, 2.090454496))
            ThreePointArc((9.8, 2.090454496), (8.4459729732, 1.4124446892), (7.9, 0))
            ThreePointArc((7.9, 0), (8.4459729732, -1.4124446892), (9.8, -2.090454496))
            Line((9.8, -2.090454496), (9.8, -1.6881943016))
            ThreePointArc((9.8, -1.6881943016), (8.3, 0), (9.8, 1.6881943016))
        make_face()
        with BuildLine():
            ThreePointArc((-9.8, -2.090454496), (-8.4459729732, -1.4124446892), (-7.9, 0))
            ThreePointArc((-7.9, 0), (-8.4459729732, 1.4124446892), (-9.8, 2.090454496))
            Line((-9.8, 2.090454496), (-9.8, 1.6881943016))
            ThreePointArc((-9.8, 1.6881943016), (-8.7291734973, 1.1291589791), (-8.3, 0))
            ThreePointArc((-8.3, 0), (-8.7291734973, -1.1291589791), (-9.8, -1.6881943016))
            Line((-9.8, -1.6881943016), (-9.8, -2.090454496))
        make_face()
        with BuildLine():
            Line((-10.2, 1.6881943016), (-10.2, 2.090454496))
            ThreePointArc((-10.2, 2.090454496), (-11.5540270268, 1.4124446892), (-12.1, 0))
            ThreePointArc((-12.1, 0), (-11.5540270268, -1.4124446892), (-10.2, -2.090454496))
            Line((-10.2, -2.090454496), (-10.2, -1.6881943016))
            ThreePointArc((-10.2, -1.6881943016), (-11.7, 0), (-10.2, 1.6881943016))
        make_face()
    extrude(amount=-F6_DEPTH)
    extrude(f6_sk.sketch, amount=F6_DEPTH_BACK)

    # F7
    f7_edges = [f3.edges().sort_by_distance(p)[0] for p in [
        (0, -52, 10),
        (-20, -52, 0),
        (0, -52, -10),
        (20, -52, 0),
    ]]
    fillet(f7_edges, radius=F7_R)


solid = Compound([f1.part, f3.part])
